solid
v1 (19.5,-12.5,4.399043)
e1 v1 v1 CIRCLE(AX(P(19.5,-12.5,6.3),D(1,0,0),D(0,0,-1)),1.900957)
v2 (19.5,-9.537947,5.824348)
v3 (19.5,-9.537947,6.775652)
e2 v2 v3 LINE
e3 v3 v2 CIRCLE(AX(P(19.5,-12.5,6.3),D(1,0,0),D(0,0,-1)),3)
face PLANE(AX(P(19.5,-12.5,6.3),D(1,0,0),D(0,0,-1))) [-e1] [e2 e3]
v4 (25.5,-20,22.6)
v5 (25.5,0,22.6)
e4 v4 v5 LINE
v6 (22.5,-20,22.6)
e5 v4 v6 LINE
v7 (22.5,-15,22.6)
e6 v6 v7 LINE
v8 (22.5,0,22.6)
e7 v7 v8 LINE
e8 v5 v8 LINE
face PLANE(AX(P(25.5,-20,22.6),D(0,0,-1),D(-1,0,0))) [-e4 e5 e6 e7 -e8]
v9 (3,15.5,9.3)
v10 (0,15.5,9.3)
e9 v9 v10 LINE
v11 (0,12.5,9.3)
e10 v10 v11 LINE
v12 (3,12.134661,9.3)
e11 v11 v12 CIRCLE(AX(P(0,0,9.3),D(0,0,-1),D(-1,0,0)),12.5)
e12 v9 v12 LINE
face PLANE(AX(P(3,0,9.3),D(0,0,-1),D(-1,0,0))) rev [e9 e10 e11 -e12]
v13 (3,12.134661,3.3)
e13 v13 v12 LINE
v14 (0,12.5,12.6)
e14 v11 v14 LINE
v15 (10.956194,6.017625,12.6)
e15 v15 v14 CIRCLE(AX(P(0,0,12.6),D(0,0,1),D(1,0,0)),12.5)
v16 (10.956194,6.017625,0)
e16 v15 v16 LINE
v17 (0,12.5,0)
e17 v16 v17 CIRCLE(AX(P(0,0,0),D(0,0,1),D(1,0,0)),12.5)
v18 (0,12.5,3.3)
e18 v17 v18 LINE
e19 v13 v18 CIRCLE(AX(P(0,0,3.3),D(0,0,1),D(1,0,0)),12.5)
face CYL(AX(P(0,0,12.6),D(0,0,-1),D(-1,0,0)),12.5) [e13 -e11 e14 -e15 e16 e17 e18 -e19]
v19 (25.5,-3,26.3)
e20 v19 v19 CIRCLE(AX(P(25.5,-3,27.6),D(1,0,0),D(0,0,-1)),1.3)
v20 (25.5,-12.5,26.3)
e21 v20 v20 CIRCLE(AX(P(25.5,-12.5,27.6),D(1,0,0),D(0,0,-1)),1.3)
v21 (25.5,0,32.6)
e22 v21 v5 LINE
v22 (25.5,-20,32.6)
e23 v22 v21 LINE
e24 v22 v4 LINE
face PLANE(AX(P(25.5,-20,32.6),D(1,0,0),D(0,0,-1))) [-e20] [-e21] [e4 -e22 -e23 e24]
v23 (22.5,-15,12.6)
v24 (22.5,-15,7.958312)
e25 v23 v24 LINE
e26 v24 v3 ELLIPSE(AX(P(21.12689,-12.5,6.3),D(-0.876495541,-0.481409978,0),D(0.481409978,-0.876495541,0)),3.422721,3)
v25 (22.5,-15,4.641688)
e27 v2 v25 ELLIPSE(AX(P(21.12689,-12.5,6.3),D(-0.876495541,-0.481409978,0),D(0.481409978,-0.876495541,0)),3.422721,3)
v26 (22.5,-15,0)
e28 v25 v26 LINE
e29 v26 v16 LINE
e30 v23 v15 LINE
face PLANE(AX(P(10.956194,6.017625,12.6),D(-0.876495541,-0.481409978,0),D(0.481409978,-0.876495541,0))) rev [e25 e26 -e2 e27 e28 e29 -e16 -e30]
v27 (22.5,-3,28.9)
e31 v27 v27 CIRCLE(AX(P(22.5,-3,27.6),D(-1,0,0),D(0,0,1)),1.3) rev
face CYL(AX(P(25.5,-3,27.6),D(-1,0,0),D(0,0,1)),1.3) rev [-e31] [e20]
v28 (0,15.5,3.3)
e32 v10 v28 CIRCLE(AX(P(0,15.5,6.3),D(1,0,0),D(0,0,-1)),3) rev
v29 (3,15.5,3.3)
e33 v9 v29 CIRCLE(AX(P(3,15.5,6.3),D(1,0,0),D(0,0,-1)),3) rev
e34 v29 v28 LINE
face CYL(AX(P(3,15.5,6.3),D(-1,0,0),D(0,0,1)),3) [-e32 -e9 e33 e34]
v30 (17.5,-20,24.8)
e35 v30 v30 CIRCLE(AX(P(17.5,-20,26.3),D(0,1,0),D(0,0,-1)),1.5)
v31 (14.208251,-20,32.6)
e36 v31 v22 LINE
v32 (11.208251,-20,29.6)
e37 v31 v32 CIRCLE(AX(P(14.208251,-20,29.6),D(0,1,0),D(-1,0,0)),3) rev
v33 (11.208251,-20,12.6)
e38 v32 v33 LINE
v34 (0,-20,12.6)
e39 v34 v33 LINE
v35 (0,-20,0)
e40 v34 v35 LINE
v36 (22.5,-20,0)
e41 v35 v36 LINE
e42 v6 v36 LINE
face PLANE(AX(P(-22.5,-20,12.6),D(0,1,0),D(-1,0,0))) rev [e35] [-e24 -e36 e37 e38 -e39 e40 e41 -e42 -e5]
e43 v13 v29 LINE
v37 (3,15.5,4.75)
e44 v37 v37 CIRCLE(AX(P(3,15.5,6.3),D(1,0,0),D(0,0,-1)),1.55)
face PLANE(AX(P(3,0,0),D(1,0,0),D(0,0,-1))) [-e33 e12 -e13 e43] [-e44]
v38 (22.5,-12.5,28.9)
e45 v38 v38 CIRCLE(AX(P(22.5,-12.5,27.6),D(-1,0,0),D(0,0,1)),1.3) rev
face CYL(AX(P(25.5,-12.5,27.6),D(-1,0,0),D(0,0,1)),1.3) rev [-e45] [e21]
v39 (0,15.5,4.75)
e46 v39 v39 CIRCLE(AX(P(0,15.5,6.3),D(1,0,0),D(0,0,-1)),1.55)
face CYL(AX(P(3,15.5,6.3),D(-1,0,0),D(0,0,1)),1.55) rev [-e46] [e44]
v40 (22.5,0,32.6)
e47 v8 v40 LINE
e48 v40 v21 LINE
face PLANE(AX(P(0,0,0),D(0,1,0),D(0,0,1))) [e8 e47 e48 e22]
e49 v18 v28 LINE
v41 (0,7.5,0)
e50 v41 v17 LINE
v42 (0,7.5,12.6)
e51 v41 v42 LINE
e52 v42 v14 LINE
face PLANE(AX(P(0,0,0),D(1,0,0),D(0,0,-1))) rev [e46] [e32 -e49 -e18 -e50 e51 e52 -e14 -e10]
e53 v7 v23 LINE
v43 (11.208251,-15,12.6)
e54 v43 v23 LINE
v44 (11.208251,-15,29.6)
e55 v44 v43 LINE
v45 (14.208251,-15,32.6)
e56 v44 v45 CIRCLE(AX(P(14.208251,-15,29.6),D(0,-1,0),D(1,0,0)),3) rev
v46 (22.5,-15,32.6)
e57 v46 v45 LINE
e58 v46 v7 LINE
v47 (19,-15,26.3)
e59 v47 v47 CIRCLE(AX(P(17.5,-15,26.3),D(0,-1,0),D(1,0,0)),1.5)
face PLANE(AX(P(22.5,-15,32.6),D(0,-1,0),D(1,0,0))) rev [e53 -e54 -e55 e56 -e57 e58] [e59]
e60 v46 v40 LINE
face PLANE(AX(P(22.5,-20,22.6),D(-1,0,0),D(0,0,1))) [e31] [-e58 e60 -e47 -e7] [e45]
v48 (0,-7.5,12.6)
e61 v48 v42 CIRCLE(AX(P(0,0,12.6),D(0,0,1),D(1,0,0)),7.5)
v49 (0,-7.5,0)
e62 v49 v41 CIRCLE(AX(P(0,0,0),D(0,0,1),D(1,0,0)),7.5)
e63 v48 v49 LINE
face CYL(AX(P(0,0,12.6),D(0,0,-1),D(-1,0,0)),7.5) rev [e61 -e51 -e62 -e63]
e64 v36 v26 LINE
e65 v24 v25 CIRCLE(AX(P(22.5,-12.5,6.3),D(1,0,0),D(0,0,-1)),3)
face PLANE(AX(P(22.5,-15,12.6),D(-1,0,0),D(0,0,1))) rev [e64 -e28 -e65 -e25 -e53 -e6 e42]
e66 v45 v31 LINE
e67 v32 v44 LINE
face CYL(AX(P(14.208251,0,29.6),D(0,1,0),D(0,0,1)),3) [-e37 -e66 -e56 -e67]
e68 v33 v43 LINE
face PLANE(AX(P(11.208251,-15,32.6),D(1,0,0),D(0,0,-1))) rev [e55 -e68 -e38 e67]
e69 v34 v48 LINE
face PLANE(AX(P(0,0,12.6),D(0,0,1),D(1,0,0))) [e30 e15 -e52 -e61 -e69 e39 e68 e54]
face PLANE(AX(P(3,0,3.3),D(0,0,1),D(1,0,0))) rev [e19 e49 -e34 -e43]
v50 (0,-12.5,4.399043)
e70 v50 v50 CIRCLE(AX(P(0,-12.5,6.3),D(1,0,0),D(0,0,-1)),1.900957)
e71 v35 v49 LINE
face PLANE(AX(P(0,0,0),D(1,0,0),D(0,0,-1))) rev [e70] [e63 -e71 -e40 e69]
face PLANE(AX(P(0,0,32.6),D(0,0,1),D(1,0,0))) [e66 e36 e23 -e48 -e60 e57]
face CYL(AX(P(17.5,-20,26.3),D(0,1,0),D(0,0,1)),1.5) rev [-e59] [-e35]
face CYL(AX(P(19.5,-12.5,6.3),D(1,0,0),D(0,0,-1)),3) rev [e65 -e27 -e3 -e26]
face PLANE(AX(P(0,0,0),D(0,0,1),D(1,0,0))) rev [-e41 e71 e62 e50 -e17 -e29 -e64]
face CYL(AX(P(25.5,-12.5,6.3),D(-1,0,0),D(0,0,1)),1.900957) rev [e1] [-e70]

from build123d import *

# Parameters (mm, degrees)
SKETCH_1_R          = 7.5
EXTRUDE_1_DEPTH     = 12.6
SKETCH_2_W          = 11.291748881
SKETCH_2_H          = 5
EXTRUDE_2_DEPTH     = 32.6
SKETCH_3_R          = 1.5
CUT_EXTRUDE_1_DEPTH = 45.373528145
FILLET_1_R          = 3
SKETCH_4_W          = 3
SKETCH_4_H          = 10
EXTRUDE_3_DEPTH     = 20
SKETCH_5_R          = 1.3
CUT_EXTRUDE_2_DEPTH = 46.967488511
SKETCH_6_W          = 35.293936169
SKETCH_6_H          = 34.958158763
CUT_EXTRUDE_3_DEPTH = 46.967488511
EXTRUDE_4_OUTLINE_R = 1.55
EXTRUDE_4_DEPTH     = 3
SKETCH_8_R          = 1.900956558
CUT_EXTRUDE_4_DEPTH = 46.967488511
SKETCH_9_R          = 3
CUT_EXTRUDE_5_DEPTH = 3


# Read off the part's stored shape, not the designer's step: 凸台-拉伸4
with BuildPart() as part:
    # 草图1 → 凸台-拉伸1 (new body)
    with BuildSketch(Plane.XY):
        with BuildLine():
            Line((-10.956194261, 6.017624724), (-22.5, -15))
            Line((-22.5, -15), (-22.5, -20))
            Line((-22.5, -20), (22.5, -20))
            Line((22.5, -20), (22.5, -15))
            Line((22.5, -15), (10.956194261, 6.017624724))
            ThreePointArc((10.956194261, 6.017624724), (0, 12.5), (-10.956194261, 6.017624724))
        make_face()
        Circle(SKETCH_1_R, mode=Mode.SUBTRACT)
    extrude(amount=EXTRUDE_1_DEPTH)

    # 草图2 → 凸台-拉伸2 (add)
    with BuildSketch(Plane.XY):
        with Locations((-16.854125559, -17.5)):
            Rectangle(SKETCH_2_W, SKETCH_2_H)
        with Locations((16.854125559, -17.5)):
            Rectangle(SKETCH_2_W, SKETCH_2_H)
    extrude(amount=EXTRUDE_2_DEPTH)

    # 草图3 → 切除-拉伸1 (cut, through all)
    with BuildSketch(Plane(origin=(0, 0, 0), x_dir=(1, 0, 0), z_dir=(0, 1, 0))):
        with Locations(Location((-17.5, -26.3, 0), (0, 0, 270))):
            Circle(SKETCH_3_R)
        with Locations((17.5, -26.3)):
            Circle(SKETCH_3_R)
    extrude(amount=-CUT_EXTRUDE_1_DEPTH, mode=Mode.SUBTRACT)

    # 圆角1
    fillet_1_edges = [part.edges().sort_by_distance(p)[0] for p in [
        (-22.5, -17.5, 32.6),
        (-11.208251119, -17.5, 32.6),
        (11.208251119, -17.5, 32.6),
    ]]
    fillet(fillet_1_edges, radius=FILLET_1_R)

    # 草图4 → 凸台-拉伸3 (add, through all)
    with BuildSketch(Plane(origin=(0, 0, 0), x_dir=(1, 0, 0), z_dir=(0, 1, 0))):
        with Locations((24, -27.6)):
            Rectangle(SKETCH_4_W, SKETCH_4_H)
    extrude(amount=-EXTRUDE_3_DEPTH)

    # 草图5 → 切除-拉伸2 (cut, through all)
    with BuildSketch(Plane(origin=(0, 0, 0), x_dir=(0, 0, -1), z_dir=(1, 0, 0))):
        with Locations(Location((-27.6, -3, 0), (0, 0, 180))):
            Circle(SKETCH_5_R)
        with Locations(Location((-27.6, -12.5, 0), (0, 0, 180))):
            Circle(SKETCH_5_R)
    extrude(amount=CUT_EXTRUDE_2_DEPTH, mode=Mode.SUBTRACT)

    # 草图6 → 切除-拉伸3 (cut, through all)
    with BuildSketch(Plane(origin=(0, 0, 0), x_dir=(0, 0, -1), z_dir=(1, 0, 0))):
        with Locations((-16.337308601, -3.7126914)):
            Rectangle(SKETCH_6_W, SKETCH_6_H)
    extrude(amount=-CUT_EXTRUDE_3_DEPTH, mode=Mode.SUBTRACT)

    # 凸台-拉伸4 outline → 凸台-拉伸4 (add)
    with BuildSketch(Plane(origin=(0, 0, 0), x_dir=(0, 0, -1), z_dir=(1, 0, 0))):
        with BuildLine():
            Line((-9.3, 15.5), (-9.3, 9.152926334))
            Line((-9.3, 9.152926334), (-3.3, 9.152926334))
            Line((-3.3, 9.152926334), (-3.3, 15.5))
            ThreePointArc((-3.3, 15.5), (-6.3, 18.5), (-9.3, 15.5))
        make_face()
        with Locations((-6.3, 15.5)):
            Circle(EXTRUDE_4_OUTLINE_R, mode=Mode.SUBTRACT)
    extrude(amount=EXTRUDE_4_DEPTH)

    # 草图8 → 切除-拉伸4 (cut, through all)
    with BuildSketch(Plane(origin=(0, 0, 0), x_dir=(0, 0, -1), z_dir=(1, 0, 0))):
        with Locations(Location((-6.3, -12.5, 0), (0, 0, 90))):
            Circle(SKETCH_8_R)
    extrude(amount=CUT_EXTRUDE_4_DEPTH, mode=Mode.SUBTRACT)

    # 草图9 → 切除-拉伸5 (cut)
    with BuildSketch(Plane(origin=(22.5, 0, 0), x_dir=(0, 0, -1), z_dir=(1, 0, 0))):
        with Locations((-6.3, -12.5)):
            Circle(SKETCH_9_R)
    extrude(amount=-CUT_EXTRUDE_5_DEPTH, mode=Mode.SUBTRACT)


solid = part.part
